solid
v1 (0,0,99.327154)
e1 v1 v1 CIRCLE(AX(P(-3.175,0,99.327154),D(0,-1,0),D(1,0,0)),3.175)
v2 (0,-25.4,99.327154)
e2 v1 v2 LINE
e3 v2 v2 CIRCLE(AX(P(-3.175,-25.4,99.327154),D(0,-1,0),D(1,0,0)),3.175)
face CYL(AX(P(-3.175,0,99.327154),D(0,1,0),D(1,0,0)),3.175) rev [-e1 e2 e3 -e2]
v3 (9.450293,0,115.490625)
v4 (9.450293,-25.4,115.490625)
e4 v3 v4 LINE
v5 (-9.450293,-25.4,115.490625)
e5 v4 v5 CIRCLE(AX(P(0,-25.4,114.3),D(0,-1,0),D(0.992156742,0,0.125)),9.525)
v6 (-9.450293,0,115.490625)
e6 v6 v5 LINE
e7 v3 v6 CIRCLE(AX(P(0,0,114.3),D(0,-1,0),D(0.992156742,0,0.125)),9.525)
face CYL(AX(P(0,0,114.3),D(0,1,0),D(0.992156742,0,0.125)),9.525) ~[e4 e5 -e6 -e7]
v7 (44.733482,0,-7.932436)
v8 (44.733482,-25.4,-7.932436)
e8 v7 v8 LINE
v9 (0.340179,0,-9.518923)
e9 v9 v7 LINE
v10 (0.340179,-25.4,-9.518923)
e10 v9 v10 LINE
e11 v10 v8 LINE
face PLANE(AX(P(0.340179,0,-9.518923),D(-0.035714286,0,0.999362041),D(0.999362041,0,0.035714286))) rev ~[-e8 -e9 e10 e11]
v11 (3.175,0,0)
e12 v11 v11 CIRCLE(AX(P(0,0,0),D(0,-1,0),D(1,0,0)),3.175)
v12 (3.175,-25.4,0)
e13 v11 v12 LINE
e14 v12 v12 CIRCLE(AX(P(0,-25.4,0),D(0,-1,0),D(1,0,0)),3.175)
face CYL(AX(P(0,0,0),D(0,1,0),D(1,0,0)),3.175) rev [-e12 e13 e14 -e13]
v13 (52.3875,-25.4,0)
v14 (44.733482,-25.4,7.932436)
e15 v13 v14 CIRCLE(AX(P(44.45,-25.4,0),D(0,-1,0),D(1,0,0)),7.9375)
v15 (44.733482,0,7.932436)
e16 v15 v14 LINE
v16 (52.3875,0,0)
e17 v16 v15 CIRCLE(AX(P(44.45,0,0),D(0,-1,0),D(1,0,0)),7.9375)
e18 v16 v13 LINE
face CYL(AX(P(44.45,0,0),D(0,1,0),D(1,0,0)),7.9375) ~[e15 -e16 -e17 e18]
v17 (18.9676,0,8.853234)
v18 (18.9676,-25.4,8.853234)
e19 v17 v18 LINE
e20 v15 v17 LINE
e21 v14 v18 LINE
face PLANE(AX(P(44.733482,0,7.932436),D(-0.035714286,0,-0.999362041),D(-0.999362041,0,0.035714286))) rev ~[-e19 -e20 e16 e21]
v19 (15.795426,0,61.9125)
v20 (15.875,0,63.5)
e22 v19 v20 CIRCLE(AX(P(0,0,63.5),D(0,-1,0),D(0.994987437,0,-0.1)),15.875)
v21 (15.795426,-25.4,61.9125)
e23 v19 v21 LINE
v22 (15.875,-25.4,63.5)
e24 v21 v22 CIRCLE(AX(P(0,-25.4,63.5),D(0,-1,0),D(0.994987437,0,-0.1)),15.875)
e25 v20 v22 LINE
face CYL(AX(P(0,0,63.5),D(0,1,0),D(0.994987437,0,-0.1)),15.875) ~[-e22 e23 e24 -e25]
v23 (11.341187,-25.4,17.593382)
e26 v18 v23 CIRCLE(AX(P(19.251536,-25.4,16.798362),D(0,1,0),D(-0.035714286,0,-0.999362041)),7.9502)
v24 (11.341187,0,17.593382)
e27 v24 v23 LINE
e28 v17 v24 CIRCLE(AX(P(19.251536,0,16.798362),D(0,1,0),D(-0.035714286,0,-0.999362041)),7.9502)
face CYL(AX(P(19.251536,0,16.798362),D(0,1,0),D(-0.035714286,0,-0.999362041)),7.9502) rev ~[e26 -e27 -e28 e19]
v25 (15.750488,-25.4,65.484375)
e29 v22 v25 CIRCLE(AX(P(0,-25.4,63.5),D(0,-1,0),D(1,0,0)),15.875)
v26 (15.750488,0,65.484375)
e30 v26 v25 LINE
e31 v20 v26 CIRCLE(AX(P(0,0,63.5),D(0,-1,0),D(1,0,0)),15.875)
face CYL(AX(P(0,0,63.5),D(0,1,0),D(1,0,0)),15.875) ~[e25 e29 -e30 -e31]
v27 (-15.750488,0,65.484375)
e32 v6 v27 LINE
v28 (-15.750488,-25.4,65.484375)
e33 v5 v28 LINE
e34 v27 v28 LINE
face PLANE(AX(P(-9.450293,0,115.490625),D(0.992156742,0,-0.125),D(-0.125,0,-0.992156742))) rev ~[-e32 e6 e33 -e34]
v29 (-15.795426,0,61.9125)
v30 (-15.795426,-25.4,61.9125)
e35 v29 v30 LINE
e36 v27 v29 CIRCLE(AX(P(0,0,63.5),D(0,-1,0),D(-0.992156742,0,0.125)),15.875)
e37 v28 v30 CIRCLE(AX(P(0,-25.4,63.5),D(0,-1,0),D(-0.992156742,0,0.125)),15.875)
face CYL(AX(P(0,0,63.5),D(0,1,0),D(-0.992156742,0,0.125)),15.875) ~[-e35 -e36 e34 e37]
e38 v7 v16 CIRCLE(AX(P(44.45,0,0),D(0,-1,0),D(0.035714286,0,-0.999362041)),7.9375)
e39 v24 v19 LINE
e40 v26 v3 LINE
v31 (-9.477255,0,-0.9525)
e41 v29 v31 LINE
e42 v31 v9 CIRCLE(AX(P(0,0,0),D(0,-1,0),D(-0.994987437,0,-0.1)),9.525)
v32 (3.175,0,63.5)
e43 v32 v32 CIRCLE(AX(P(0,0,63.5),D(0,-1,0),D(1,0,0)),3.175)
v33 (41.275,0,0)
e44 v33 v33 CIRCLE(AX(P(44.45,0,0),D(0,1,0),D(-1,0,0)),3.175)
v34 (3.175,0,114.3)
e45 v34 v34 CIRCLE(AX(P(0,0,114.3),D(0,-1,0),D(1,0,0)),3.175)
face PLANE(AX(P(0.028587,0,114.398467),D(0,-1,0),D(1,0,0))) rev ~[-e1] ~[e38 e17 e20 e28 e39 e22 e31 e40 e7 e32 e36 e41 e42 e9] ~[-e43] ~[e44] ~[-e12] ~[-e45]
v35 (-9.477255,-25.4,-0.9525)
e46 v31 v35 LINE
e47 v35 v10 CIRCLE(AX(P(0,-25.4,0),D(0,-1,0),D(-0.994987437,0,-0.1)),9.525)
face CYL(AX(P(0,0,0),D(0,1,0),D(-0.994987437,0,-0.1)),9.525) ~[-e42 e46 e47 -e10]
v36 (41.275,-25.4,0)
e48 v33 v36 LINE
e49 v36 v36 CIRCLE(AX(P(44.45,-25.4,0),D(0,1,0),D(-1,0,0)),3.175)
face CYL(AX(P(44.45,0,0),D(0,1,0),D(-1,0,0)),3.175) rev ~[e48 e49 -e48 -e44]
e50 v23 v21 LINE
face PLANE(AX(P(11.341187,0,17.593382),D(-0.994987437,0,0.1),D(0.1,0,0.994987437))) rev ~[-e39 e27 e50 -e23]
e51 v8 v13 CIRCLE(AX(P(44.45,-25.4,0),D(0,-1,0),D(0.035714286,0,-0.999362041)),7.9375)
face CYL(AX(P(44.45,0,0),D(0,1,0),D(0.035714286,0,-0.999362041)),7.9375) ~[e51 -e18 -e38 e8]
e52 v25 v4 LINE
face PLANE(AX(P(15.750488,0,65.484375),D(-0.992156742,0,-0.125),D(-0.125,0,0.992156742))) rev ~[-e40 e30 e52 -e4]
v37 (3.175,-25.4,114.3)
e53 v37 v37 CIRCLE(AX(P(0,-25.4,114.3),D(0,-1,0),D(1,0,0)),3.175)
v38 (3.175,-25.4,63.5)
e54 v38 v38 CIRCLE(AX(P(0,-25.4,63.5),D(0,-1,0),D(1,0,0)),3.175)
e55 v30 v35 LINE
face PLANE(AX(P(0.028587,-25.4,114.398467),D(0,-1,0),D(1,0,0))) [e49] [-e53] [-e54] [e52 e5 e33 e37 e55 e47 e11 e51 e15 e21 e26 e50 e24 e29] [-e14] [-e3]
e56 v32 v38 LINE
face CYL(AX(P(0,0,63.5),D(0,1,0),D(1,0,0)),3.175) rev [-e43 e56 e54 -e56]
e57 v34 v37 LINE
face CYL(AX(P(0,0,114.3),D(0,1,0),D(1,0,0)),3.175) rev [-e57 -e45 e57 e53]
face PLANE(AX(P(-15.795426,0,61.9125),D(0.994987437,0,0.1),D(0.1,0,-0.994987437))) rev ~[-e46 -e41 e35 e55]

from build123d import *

# Parameters (mm, degrees)
F0_R     = 3.175
F1_DEPTH = 25.4


# Not quite as in the source:
# - a feature names something its author has since deleted; it is built from what else it names


with BuildPart() as f1:
    # F0 (on Front) → F1 (new body)
    with BuildSketch(Plane.XZ):
        with BuildLine():
            ThreePointArc((9.4502929642, 115.490625), (0, 123.825), (-9.4502929642, 115.490625))
            ThreePointArc((-9.4502929642, 115.490625), (-0.596483242, 104.7936951058), (9.525, 114.3))
            ThreePointArc((9.525, 114.3), (9.5063048942, 114.896483242), (9.4502929642, 115.490625))
        make_face()
        with Locations((0, 114.3)):
            Circle(F0_R, mode=Mode.SUBTRACT)
        with BuildLine():
            Line((-9.4502929642, 115.490625), (-15.7504882737, 65.484375))
            ThreePointArc((-15.7504882737, 65.484375), (0, 79.375), (15.7504882737, 65.484375))
            Line((15.7504882737, 65.484375), (9.4502929642, 115.490625))
            ThreePointArc((9.4502929642, 115.490625), (9.5063048942, 114.896483242), (9.525, 114.3))
            ThreePointArc((9.525, 114.3), (-0.596483242, 104.7936951058), (-9.4502929642, 115.490625))
        make_face()
        with Locations((-3.175, 99.3271544576)):
            Circle(F0_R, mode=Mode.SUBTRACT)
        with BuildLine():
            ThreePointArc((-15.7504882737, 65.484375), (-15.8737438155, 63.6997054867), (-15.7954255641, 61.9125))
            ThreePointArc((-15.7954255641, 61.9125), (0, 47.625), (15.7954255641, 61.9125))
            ThreePointArc((15.7954255641, 61.9125), (15.8550939106, 62.7052534459), (15.875, 63.5))
            ThreePointArc((15.875, 63.5), (15.8438414904, 64.4941387366), (15.7504882737, 65.484375))
            ThreePointArc((15.7504882737, 65.484375), (0, 79.375), (-15.7504882737, 65.484375))
        make_face()
        with Locations((0, 63.5)):
            Circle(F0_R, mode=Mode.SUBTRACT)
        with BuildLine():
            ThreePointArc((-9.4772553384, -0.9525), (-0.4768479324, 9.5130563464), (9.525, 0))
            Line((9.525, 0), (36.5125, 0))
            ThreePointArc((36.5125, 0), (38.9384772185, 5.7120069047), (44.7334821429, 7.9324362036))
            Line((44.7334821429, 7.9324362036), (18.9676000005, 8.8532337108))
            ThreePointArc((18.9676000005, 8.8532337108), (13.2611998974, 11.5713591498), (11.3411865923, 17.5933818124))
            Line((11.3411865923, 17.5933818124), (15.7954255641, 61.9125))
            ThreePointArc((15.7954255641, 61.9125), (0, 47.625), (-15.7954255641, 61.9125))
            Line((-15.7954255641, 61.9125), (-9.4772553384, -0.9525))
        make_face()
        with BuildLine():
            ThreePointArc((0.3401785714, -9.5189234444), (6.8544082857, -6.6138273378), (9.525, 0))
            ThreePointArc((9.525, 0), (-0.4768479324, 9.5130563464), (-9.4772553384, -0.9525))
            ThreePointArc((-9.4772553384, -0.9525), (-6.2623833816, -7.1769199091), (0.3401785714, -9.5189234444))
        make_face()
        Circle(F0_R, mode=Mode.SUBTRACT)
        with BuildLine():
            Line((36.5125, 0), (9.525, 0))
            ThreePointArc((9.525, 0), (6.8544082857, -6.6138273378), (0.3401785714, -9.5189234444))
            Line((0.3401785714, -9.5189234444), (44.7334821429, -7.9324362036))
            ThreePointArc((44.7334821429, -7.9324362036), (38.9384772185, -5.7120069047), (36.5125, 0))
        make_face()
        with BuildLine():
            ThreePointArc((44.7334821429, 7.9324362036), (38.9384772185, 5.7120069047), (36.5125, 0))
            ThreePointArc((36.5125, 0), (38.9384772185, -5.7120069047), (44.7334821429, -7.9324362036))
            ThreePointArc((44.7334821429, -7.9324362036), (50.1620069047, -5.5115227815), (52.3875, 0))
            ThreePointArc((52.3875, 0), (50.1620069047, 5.5115227815), (44.7334821429, 7.9324362036))
        make_face()
        with BuildLine():
            ThreePointArc((47.625, 0), (44.45, -3.175), (41.275, 0))
            ThreePointArc((41.275, 0), (44.45, 3.175), (47.625, 0))
        make_face(mode=Mode.SUBTRACT)
    extrude(amount=F1_DEPTH)


solid = f1.part
